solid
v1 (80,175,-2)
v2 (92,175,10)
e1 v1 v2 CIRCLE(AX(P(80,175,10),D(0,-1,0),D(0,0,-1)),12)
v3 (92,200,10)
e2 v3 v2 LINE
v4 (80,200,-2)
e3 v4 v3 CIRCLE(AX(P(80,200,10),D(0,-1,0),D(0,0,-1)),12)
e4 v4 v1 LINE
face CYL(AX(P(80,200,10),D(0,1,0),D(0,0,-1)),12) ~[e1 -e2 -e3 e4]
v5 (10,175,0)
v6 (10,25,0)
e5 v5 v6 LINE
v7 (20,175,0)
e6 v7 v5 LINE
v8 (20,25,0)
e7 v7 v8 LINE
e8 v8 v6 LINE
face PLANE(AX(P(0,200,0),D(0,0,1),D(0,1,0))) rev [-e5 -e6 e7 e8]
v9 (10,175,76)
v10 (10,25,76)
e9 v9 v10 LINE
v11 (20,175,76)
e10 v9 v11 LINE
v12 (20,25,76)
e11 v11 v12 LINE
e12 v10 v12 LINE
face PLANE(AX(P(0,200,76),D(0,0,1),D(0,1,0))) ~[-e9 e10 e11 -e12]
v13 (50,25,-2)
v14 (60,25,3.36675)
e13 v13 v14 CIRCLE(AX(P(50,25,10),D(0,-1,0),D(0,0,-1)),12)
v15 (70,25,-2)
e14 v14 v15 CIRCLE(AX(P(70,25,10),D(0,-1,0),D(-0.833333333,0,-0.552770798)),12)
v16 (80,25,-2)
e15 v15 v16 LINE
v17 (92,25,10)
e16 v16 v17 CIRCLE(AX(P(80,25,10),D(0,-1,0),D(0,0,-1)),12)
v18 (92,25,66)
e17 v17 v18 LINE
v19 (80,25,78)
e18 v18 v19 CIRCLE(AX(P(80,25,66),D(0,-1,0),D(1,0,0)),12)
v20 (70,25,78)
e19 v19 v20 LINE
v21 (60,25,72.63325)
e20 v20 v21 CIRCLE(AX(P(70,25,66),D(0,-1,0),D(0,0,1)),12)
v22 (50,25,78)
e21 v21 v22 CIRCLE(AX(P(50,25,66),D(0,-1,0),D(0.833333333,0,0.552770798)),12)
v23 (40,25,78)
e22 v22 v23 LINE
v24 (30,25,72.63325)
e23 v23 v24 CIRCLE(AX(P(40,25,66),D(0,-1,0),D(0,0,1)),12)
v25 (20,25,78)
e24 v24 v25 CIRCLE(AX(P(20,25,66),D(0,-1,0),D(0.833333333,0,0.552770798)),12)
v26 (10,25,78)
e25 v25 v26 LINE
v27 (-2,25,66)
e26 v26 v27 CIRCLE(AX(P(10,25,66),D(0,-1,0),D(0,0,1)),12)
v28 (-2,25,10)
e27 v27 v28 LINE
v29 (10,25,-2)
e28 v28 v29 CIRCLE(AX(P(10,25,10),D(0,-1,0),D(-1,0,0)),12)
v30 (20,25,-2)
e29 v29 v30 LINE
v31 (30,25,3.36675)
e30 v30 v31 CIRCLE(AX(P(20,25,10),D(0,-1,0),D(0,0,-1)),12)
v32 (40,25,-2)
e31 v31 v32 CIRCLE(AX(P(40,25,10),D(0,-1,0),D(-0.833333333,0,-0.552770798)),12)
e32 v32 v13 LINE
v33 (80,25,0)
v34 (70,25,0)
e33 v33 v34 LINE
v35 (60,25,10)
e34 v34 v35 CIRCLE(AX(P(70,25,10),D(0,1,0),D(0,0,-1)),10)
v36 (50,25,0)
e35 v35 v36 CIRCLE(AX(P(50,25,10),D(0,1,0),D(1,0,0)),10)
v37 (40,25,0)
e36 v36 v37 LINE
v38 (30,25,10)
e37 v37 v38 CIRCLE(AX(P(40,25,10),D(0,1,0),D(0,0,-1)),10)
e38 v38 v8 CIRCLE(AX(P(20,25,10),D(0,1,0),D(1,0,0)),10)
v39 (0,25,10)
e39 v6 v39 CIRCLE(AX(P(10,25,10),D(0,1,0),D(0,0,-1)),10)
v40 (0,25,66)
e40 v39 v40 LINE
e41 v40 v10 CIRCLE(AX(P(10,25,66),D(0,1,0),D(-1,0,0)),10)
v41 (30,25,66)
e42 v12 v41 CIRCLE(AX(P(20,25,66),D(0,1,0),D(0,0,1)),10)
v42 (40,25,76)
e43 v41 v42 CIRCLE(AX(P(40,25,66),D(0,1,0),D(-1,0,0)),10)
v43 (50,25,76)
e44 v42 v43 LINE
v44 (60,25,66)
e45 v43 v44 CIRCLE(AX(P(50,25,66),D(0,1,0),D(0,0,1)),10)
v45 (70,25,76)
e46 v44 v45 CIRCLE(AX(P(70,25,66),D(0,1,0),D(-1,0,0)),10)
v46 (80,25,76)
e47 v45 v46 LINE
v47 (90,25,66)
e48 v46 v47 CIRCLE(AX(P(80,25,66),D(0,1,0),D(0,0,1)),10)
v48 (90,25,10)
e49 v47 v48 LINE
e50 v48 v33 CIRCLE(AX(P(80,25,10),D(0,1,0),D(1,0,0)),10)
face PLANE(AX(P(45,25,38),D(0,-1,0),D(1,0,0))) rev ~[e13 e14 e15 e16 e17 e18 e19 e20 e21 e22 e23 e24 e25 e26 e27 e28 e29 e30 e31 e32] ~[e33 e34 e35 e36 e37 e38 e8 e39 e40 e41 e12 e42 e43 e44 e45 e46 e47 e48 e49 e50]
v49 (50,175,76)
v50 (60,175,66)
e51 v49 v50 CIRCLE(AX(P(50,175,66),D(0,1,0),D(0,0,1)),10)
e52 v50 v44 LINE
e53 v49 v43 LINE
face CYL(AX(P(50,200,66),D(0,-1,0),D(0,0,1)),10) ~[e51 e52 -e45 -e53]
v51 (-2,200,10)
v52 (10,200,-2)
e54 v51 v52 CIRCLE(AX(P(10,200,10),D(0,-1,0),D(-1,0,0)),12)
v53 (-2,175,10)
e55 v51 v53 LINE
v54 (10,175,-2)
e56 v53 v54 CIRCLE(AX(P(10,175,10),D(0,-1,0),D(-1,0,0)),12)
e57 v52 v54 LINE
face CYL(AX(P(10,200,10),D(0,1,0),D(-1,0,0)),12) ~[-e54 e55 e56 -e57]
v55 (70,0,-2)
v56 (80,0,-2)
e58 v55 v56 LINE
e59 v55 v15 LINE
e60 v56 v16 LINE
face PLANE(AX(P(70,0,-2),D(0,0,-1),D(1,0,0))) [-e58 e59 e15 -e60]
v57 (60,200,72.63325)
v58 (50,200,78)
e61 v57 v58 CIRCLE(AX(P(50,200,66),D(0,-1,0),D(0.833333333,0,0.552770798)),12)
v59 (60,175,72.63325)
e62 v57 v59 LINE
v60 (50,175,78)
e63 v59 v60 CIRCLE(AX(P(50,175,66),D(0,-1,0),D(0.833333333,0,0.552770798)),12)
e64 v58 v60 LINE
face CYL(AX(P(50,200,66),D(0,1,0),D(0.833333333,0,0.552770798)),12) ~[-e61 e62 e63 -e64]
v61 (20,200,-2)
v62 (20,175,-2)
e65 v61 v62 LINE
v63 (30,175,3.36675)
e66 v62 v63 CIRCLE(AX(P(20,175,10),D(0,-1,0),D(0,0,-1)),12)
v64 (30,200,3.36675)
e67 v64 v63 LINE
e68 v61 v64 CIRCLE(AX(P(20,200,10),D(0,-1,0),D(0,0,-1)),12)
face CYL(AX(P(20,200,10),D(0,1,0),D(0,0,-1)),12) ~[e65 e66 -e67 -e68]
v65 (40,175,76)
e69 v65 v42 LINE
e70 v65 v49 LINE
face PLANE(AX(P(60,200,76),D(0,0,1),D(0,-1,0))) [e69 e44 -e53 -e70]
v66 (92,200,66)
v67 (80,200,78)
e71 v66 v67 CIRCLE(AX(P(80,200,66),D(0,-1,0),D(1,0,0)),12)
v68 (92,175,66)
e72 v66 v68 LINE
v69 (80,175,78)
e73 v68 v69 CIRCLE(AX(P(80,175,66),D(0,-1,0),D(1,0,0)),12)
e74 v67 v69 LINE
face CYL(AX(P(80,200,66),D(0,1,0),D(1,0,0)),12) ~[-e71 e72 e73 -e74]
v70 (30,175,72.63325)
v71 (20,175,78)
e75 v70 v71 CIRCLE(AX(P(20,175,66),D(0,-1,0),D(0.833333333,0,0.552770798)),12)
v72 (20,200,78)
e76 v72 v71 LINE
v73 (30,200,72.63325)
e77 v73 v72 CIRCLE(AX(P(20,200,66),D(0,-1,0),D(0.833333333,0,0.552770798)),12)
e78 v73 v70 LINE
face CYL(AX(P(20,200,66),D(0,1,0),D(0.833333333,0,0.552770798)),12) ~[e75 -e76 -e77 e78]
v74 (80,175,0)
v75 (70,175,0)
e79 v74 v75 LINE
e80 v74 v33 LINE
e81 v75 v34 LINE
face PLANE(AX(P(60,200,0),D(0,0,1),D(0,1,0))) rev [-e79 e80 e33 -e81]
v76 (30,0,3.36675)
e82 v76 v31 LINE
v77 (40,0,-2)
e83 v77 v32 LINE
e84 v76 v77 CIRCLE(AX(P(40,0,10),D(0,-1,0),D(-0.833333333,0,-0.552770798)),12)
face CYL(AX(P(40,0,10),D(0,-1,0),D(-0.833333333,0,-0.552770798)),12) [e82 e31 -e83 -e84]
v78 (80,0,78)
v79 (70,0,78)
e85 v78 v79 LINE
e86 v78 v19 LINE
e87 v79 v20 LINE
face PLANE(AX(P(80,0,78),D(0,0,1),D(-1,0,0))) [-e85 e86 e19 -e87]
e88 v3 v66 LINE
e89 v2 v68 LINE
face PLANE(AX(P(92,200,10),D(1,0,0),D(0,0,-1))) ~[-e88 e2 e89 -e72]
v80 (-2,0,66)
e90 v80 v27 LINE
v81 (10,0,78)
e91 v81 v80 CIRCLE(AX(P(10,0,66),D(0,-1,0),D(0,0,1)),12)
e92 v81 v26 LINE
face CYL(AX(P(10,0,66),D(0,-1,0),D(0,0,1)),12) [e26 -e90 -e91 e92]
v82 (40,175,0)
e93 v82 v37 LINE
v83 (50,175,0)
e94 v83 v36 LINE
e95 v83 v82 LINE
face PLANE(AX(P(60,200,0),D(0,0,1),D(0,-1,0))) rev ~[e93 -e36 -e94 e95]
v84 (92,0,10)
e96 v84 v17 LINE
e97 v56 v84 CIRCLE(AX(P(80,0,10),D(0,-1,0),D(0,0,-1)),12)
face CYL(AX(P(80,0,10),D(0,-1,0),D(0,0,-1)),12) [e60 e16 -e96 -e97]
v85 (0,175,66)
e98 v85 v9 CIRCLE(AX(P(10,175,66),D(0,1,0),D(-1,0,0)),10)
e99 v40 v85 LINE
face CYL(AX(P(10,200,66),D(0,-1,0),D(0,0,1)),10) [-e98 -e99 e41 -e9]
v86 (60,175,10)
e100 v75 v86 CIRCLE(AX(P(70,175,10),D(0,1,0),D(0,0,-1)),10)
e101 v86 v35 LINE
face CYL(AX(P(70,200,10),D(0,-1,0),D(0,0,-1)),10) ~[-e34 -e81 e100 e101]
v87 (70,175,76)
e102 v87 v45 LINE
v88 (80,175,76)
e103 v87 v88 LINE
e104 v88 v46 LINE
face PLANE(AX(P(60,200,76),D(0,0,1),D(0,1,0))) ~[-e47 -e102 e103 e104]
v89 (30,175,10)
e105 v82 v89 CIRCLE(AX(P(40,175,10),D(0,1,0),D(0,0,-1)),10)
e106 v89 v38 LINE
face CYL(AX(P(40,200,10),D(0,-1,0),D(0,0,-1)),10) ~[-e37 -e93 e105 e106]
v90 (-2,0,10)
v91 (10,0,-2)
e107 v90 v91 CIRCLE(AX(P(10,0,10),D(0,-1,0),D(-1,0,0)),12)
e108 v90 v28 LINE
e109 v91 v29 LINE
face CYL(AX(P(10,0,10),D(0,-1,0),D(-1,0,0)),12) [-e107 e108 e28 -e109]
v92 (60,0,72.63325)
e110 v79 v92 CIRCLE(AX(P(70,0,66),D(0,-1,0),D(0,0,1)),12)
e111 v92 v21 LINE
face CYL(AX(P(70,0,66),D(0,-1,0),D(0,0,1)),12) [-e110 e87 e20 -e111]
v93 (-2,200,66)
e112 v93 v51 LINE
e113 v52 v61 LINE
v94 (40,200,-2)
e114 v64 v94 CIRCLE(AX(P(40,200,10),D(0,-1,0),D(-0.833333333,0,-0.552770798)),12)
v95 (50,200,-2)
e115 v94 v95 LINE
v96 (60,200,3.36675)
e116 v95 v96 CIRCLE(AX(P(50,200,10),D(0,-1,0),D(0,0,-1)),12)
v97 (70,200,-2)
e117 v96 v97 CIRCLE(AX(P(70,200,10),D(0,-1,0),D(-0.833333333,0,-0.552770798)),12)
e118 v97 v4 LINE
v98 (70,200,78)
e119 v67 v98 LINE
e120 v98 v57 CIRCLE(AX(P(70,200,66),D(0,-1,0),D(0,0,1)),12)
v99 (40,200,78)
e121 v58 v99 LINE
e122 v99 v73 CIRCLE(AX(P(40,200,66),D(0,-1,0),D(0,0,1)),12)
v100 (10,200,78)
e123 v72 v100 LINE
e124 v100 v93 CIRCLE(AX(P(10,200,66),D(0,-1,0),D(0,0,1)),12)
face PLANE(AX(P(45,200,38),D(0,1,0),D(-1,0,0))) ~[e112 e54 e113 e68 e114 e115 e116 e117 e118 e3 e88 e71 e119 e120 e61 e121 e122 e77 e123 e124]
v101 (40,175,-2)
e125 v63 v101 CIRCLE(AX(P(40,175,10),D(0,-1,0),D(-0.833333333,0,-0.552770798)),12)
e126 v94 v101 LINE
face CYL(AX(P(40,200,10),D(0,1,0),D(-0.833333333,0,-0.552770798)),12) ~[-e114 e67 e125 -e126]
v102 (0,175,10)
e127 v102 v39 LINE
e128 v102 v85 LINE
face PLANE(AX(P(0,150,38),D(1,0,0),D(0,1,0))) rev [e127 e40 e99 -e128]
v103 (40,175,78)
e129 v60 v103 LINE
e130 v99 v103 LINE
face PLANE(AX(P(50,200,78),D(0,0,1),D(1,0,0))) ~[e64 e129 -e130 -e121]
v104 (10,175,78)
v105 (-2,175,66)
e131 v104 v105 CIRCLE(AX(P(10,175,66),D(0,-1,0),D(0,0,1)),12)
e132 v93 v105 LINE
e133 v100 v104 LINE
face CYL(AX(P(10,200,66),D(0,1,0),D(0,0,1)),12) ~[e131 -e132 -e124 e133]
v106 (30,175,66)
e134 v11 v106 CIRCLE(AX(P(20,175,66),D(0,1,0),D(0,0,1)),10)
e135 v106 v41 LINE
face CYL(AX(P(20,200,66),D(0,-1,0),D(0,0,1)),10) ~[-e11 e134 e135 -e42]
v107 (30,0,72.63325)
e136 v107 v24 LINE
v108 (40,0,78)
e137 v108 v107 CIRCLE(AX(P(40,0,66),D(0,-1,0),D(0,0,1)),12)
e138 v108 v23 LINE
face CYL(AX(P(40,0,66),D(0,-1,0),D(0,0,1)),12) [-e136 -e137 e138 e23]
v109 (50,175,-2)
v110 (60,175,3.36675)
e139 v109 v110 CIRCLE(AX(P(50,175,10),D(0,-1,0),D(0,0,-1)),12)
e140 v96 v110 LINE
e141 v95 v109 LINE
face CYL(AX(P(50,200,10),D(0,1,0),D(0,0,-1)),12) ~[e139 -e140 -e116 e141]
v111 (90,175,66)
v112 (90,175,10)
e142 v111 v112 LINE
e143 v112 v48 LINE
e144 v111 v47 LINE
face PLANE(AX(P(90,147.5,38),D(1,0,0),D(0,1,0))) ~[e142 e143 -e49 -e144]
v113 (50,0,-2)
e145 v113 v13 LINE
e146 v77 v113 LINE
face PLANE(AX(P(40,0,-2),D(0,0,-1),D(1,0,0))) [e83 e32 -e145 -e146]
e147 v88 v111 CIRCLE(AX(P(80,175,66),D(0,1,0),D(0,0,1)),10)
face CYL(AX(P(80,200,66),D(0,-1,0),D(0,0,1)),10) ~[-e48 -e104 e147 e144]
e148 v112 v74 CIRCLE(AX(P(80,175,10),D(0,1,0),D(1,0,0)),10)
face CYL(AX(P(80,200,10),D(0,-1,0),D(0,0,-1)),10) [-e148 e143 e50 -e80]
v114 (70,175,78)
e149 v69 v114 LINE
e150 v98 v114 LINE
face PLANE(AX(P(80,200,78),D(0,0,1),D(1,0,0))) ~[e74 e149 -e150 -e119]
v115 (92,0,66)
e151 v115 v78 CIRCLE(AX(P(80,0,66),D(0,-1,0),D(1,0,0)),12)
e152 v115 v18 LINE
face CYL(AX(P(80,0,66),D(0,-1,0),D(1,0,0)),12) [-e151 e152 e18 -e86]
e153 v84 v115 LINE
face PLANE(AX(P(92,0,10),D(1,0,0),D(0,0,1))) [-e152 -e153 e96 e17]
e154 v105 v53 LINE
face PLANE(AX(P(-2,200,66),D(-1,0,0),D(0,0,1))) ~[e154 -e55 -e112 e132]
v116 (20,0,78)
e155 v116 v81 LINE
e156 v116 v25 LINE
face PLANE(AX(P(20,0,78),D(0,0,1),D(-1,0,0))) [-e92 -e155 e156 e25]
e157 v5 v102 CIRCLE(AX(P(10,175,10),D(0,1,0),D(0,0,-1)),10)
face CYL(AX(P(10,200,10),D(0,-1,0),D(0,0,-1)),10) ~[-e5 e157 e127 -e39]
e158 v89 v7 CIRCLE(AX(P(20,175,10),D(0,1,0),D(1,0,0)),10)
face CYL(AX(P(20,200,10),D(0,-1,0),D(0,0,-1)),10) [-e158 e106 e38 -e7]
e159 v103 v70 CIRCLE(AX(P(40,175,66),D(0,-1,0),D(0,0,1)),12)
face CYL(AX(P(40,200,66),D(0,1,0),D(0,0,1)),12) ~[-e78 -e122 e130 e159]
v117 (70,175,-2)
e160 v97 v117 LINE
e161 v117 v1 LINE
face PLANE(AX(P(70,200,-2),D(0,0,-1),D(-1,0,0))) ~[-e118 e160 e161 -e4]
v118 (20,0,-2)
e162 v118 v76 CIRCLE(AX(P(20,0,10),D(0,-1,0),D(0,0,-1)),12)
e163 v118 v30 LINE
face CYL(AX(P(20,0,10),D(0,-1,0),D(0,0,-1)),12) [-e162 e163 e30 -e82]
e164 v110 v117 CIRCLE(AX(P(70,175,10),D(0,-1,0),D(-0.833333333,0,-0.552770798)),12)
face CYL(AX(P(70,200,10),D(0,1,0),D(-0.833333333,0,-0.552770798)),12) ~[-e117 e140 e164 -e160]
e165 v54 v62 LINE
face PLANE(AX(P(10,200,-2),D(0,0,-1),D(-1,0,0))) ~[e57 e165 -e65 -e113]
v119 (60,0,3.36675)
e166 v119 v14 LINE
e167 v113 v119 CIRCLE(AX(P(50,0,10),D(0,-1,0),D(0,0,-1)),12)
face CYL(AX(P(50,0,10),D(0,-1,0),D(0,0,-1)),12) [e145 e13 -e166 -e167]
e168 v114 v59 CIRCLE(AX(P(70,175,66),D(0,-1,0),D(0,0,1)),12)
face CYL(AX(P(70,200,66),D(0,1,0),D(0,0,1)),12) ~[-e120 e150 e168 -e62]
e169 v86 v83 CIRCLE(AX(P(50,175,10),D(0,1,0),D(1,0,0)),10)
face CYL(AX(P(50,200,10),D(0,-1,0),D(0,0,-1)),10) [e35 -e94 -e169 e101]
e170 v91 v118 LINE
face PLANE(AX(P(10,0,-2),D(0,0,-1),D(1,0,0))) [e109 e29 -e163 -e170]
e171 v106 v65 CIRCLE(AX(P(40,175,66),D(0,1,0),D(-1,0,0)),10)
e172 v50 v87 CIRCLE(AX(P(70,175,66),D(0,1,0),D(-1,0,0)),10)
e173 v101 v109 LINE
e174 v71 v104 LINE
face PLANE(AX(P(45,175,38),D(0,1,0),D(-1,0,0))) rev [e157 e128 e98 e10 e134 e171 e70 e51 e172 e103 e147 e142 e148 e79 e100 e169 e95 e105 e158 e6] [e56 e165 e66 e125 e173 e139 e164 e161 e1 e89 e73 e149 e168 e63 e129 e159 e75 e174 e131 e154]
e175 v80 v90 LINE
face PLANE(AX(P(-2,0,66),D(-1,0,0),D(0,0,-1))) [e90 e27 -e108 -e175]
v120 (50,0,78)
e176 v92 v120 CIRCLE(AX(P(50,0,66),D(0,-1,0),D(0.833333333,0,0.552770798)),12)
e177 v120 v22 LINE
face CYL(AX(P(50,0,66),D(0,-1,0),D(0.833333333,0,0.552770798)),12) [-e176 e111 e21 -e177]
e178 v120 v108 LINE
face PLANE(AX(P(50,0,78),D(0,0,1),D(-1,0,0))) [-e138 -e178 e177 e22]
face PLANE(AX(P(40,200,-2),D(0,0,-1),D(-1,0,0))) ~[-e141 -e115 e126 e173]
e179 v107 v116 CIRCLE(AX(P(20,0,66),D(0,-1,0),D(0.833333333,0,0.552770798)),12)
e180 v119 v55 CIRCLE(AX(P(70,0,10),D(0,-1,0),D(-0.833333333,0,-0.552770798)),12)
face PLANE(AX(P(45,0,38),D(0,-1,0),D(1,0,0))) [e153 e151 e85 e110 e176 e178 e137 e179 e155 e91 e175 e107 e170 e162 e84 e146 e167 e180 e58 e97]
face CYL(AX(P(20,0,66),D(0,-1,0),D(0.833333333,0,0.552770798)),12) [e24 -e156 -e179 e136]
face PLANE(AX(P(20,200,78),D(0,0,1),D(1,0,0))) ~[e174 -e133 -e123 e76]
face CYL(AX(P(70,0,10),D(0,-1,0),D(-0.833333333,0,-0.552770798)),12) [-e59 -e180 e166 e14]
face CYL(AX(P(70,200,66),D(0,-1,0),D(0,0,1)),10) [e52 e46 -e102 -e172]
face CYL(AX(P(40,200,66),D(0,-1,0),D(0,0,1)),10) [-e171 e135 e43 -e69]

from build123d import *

# Parameters (mm, degrees)
F0_W     = 100
F0_H     = 76
F1_DEPTH = 30
F2_R     = 10
F5_W     = 115
F5_H     = 96
F5_W_2   = 100
F5_H_2   = 56
F6_DEPTH = 30
F8_DEPTH = 25


with BuildPart() as f1:
    # F0 (on Right) → F1 (new body)
    with BuildSketch(Plane.YZ):
        with Locations((50, 38)):
            Rectangle(F0_W, F0_H)
    extrude(amount=F1_DEPTH)

    # F2
    f2_edges = [f1.edges().sort_by_distance(p)[0] for p in [
        (30, 50, 76),
        (0, 50, 76),
        (30, 50, 0),
        (0, 50, 0),
    ]]
    fillet(f2_edges, radius=F2_R)

    # F3: F1 across face


with BuildPart() as f1_1:
    add(f1.part)
    add(f1.part.mirror(Plane(origin=(30, 50, 38), x_dir=(0, 1, 0), z_dir=(1, 0, 0))))

    # F4: F1 across face


with BuildPart() as f1_2:
    add(f1_1.part)
    add(f1_1.part.mirror(Plane(origin=(60, 50, 38), x_dir=(0, 1, 0), z_dir=(1, 0, 0))))

    # F5 (on face) → F6 (cut)
    with BuildSketch(Plane.YZ.offset(120)):
        with Locations((52.5, 38)):
            Rectangle(F5_W, F5_H)
        with Locations((50, 38)):
            Rectangle(F5_W_2, F5_H_2, mode=Mode.SUBTRACT)
        with Locations((50, 38)):
            Rectangle(F5_W_2, F5_H_2)
    extrude(amount=-F6_DEPTH, mode=Mode.SUBTRACT)

    # F7 (on face) → F8 (join)
    with BuildSketch(Plane.XZ):
        with BuildLine():
            ThreePointArc((60, 3.3667504193), (64.3254513381, -0.5735281474), (70, -2))
            Line((70, -2), (80, -2))
            ThreePointArc((80, -2), (88.4852813742, 1.5147186258), (92, 10))
            Line((92, 10), (92, 66))
            ThreePointArc((92, 66), (88.4852813742, 74.4852813742), (80, 78))
            Line((80, 78), (70, 78))
            ThreePointArc((70, 78), (64.3254513381, 76.5735281474), (60, 72.6332495807))
            ThreePointArc((60, 72.6332495807), (55.6745486619, 76.5735281474), (50, 78))
            Line((50, 78), (40, 78))
            ThreePointArc((40, 78), (34.3254513381, 76.5735281474), (30, 72.6332495807))
            ThreePointArc((30, 72.6332495807), (25.6745486619, 76.5735281474), (20, 78))
            Line((20, 78), (10, 78))
            ThreePointArc((10, 78), (1.5147186258, 74.4852813742), (-2, 66))
            Line((-2, 66), (-2, 10))
            ThreePointArc((-2, 10), (1.5147186258, 1.5147186258), (10, -2))
            Line((10, -2), (20, -2))
            ThreePointArc((20, -2), (25.6745486619, -0.5735281474), (30, 3.3667504193))
            ThreePointArc((30, 3.3667504193), (34.3254513381, -0.5735281474), (40, -2))
            Line((40, -2), (50, -2))
            ThreePointArc((50, -2), (55.6745486619, -0.5735281474), (60, 3.3667504193))
        make_face()
        with BuildLine():
            ThreePointArc((0, 66), (2.9289321881, 73.0710678119), (10, 76))
            Line((10, 76), (20, 76))
            ThreePointArc((20, 76), (27.0710678119, 73.0710678119), (30, 66))
            ThreePointArc((30, 66), (32.9289321881, 73.0710678119), (40, 76))
            Line((40, 76), (50, 76))
            ThreePointArc((50, 76), (57.0710678119, 73.0710678119), (60, 66))
            ThreePointArc((60, 66), (62.9289321881, 73.0710678119), (70, 76))
            Line((70, 76), (80, 76))
            ThreePointArc((80, 76), (87.0710678119, 73.0710678119), (90, 66))
            Line((90, 66), (90, 10))
            ThreePointArc((90, 10), (87.0710678119, 2.9289321881), (80, 0))
            Line((80, 0), (70, 0))
            ThreePointArc((70, 0), (62.9289321881, 2.9289321881), (60, 10))
            ThreePointArc((60, 10), (57.0710678119, 2.9289321881), (50, 0))
            Line((50, 0), (40, 0))
            ThreePointArc((40, 0), (32.9289321881, 2.9289321881), (30, 10))
            ThreePointArc((30, 10), (27.0710678119, 2.9289321881), (20, 0))
            Line((20, 0), (10, 0))
            ThreePointArc((10, 0), (2.9289321881, 2.9289321881), (0, 10))
            Line((0, 10), (0, 66))
        make_face(mode=Mode.SUBTRACT)
    extrude(amount=-F8_DEPTH)

    # F9: F1 across face


with BuildPart() as f1_3:
    add(f1_2.part)
    add(f1_2.part.mirror(Plane(origin=(45, 100, 38), x_dir=(-1, 0, 0), z_dir=(0, 1, 0))))


solid = f1_3.part
